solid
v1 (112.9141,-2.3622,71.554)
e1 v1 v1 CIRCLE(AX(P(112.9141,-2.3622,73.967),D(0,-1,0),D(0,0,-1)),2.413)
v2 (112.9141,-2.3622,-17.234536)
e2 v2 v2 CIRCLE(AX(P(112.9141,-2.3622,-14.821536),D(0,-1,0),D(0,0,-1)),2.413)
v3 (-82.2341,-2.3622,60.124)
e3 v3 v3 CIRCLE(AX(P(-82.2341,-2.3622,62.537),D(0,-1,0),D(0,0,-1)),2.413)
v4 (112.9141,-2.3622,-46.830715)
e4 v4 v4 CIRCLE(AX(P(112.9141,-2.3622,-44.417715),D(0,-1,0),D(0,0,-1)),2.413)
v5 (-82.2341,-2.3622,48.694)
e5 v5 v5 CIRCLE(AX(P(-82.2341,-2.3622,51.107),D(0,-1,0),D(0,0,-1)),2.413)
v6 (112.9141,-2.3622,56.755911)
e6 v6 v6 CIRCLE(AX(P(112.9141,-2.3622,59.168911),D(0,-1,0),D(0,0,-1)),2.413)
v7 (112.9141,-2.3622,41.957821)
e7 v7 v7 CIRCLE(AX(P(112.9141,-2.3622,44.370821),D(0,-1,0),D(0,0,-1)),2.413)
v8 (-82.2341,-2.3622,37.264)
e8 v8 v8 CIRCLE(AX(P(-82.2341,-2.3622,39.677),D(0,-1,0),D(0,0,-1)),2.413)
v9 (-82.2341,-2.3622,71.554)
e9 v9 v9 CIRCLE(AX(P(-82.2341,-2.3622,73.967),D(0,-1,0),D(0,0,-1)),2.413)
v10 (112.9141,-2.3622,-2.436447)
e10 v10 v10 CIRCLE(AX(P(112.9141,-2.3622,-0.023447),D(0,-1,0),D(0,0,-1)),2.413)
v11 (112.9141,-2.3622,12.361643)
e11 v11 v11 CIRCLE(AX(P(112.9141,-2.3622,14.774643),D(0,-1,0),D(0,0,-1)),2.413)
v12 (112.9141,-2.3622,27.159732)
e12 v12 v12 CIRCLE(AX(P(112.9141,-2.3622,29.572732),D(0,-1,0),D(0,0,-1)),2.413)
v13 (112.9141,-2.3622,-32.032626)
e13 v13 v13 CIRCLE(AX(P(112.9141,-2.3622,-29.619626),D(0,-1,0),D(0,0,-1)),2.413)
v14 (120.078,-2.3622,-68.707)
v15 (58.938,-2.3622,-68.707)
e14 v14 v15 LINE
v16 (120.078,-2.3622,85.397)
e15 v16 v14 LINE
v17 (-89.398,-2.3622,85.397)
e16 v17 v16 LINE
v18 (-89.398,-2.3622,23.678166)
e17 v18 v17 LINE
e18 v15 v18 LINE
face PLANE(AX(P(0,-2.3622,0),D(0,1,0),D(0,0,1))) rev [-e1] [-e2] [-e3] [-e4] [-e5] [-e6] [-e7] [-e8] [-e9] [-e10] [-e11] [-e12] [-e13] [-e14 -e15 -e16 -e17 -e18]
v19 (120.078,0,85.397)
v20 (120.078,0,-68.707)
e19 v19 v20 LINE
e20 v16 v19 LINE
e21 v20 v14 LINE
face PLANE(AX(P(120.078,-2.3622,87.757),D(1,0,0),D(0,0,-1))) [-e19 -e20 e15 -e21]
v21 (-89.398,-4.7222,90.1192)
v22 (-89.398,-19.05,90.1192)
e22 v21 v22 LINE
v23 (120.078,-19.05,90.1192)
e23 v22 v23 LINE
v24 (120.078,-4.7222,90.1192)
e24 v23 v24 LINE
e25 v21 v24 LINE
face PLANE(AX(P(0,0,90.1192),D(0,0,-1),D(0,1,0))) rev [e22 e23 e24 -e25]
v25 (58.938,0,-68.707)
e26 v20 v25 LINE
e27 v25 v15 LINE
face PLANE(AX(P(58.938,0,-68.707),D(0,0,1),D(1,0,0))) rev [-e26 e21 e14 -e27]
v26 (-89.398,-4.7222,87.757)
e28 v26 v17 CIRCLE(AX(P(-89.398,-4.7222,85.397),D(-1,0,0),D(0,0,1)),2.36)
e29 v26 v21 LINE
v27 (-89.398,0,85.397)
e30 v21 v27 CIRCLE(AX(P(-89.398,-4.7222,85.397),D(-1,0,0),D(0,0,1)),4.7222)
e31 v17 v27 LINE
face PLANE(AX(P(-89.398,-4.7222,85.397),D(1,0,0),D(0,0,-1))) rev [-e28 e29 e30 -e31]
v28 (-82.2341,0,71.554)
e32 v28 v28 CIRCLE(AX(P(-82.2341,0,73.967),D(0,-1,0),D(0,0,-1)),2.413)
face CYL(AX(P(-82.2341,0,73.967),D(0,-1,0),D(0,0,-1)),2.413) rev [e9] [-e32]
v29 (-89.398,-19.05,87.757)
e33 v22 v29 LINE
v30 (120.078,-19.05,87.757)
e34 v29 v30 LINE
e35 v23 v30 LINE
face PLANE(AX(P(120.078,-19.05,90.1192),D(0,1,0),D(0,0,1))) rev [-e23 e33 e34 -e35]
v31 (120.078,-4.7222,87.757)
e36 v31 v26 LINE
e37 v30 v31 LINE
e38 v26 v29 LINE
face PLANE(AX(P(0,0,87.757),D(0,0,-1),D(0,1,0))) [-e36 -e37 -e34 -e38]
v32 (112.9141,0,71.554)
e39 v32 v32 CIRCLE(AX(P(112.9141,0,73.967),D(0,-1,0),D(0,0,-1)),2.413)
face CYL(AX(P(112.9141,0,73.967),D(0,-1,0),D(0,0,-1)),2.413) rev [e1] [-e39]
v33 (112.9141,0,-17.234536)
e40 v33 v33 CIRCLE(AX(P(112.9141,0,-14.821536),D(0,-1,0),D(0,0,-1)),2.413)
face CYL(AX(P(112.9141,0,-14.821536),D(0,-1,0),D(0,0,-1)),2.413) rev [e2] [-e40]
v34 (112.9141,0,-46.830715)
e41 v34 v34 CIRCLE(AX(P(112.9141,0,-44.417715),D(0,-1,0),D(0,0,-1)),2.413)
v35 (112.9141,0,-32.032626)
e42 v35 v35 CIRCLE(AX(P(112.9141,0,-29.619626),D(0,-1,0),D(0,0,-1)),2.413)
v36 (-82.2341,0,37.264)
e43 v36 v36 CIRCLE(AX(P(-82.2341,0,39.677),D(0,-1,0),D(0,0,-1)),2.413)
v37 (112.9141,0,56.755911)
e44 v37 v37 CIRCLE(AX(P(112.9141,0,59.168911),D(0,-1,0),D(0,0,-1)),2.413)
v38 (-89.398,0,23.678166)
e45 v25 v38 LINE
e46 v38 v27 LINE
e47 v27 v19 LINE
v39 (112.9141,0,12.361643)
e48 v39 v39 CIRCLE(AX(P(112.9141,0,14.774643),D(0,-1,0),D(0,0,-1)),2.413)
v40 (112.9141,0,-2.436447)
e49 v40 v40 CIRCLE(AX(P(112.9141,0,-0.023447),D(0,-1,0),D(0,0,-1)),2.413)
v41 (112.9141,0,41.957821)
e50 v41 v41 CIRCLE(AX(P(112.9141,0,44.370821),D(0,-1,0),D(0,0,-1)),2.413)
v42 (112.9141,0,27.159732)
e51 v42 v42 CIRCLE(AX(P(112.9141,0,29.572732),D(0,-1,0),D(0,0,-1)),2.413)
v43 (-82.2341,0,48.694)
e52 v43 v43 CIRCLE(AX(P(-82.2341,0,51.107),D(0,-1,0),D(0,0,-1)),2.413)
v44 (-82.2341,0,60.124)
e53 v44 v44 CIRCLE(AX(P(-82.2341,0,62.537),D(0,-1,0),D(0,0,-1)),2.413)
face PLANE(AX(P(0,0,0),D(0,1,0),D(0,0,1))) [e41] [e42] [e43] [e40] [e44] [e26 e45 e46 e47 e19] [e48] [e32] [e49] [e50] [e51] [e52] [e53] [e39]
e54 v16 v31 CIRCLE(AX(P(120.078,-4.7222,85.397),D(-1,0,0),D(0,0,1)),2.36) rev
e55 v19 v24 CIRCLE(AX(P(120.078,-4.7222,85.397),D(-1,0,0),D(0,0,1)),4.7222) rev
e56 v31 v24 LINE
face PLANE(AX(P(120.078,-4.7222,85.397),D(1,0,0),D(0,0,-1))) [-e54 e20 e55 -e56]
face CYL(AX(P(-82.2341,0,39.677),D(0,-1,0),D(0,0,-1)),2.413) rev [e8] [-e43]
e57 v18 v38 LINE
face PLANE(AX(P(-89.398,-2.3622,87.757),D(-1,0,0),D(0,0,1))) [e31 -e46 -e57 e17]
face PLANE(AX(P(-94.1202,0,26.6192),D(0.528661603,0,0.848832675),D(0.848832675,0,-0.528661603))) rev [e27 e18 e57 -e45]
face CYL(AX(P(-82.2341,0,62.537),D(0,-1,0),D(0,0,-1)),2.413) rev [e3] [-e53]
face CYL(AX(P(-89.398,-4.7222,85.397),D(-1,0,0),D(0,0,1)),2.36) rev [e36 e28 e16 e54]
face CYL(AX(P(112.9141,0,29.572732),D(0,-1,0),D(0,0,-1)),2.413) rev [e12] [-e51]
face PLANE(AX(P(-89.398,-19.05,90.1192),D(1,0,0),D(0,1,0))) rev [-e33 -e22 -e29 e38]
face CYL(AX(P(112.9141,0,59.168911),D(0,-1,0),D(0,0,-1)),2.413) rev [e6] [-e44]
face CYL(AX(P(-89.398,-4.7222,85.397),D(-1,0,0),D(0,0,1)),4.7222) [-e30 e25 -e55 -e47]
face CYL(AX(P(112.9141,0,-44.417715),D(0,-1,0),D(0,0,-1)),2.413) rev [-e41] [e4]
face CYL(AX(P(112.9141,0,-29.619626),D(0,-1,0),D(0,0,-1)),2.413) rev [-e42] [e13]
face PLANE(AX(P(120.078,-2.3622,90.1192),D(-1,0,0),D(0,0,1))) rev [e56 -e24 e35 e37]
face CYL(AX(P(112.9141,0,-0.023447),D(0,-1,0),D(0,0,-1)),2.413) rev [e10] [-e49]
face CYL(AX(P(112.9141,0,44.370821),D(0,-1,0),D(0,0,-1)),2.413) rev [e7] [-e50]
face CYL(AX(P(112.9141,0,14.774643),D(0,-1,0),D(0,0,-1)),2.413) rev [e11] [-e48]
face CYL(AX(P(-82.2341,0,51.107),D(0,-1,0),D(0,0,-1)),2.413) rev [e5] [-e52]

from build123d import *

# Parameters (mm, degrees)
SKETCH1_W                    = 209.476
SKETCH1_H                    = 175.514
BASE_FLANGE1_DEPTH           = 2.3622
EDGE_FLANGE4_STRIP_W         = 14.1688
EDGE_FLANGE4_STRIP_H         = 2.3622
EDGE_FLANGE4_STRIP_CUT_DEPTH = 209.476
EDGE_FLANGE4_DEPTH           = 209.476
CUT_EXTRUDE1_DEPTH           = 152.058528265
SKETCH38_R                   = 2.413
CUT_EXTRUDE2_DEPTH           = 152.058528265
SKETCH39_R                   = 2.413
CUT_EXTRUDE3_DEPTH           = 152.058528265


# Sheet-metal steps are written as plain solids
with BuildPart() as part:
    # Sketch1 → Base-Flange1 (new body)
    with BuildSketch(Plane(origin=(0, 0, 0), x_dir=(1, 0, 0), z_dir=(0, 1, 0))):
        with Locations((15.34, 0)):
            Rectangle(SKETCH1_W, SKETCH1_H)
    extrude(amount=-BASE_FLANGE1_DEPTH)

    # Edge-Flange4 strip (across the edge) → Edge-Flange4 strip cut (cut)
    with BuildSketch(Plane(origin=(120.078, -2.3622, 87.757), x_dir=(0, 0, -1), z_dir=(-1, 0, 0))):
        with Locations((-4.7244, -1.1811)):
            Rectangle(EDGE_FLANGE4_STRIP_W, EDGE_FLANGE4_STRIP_H)
    extrude(amount=EDGE_FLANGE4_STRIP_CUT_DEPTH, mode=Mode.SUBTRACT)

    # Edge-Flange4 section (across the edge) → Edge-Flange4 (add)
    with BuildSketch(Plane(origin=(120.078, -2.3622, 87.757), x_dir=(0, 0, -1), z_dir=(-1, 0, 0))):
        with BuildLine():
            Line((-2.3622, 2.36), (-2.3622, 16.6878))
            Line((-2.3622, 16.6878), (0, 16.6878))
            Line((0, 16.6878), (0, 2.36))
            ThreePointArc((0, 2.36), (0.691227996, 0.691227996), (2.36, 0))
            Line((2.36, 0), (2.36, -2.3622))
            ThreePointArc((2.36, -2.3622), (-0.979099642, -0.979099642), (-2.3622, 2.36))
        make_face()
    extrude(amount=EDGE_FLANGE4_DEPTH)

    # Sketch36 → Cut-Extrude1 (cut, through all)
    with BuildSketch(Plane.XZ.offset(2.3622)):
        Polygon((-94.1202, 26.6192), (58.938, -68.707), (140.022587244, -68.707), (140.022587244, -102.574234495), (-121.93122604, -102.574234495), (-121.93122604, 26.6192), align=None)
    extrude(amount=-CUT_EXTRUDE1_DEPTH, mode=Mode.SUBTRACT)

    # Sketch38 → Cut-Extrude2 (cut, through all)
    with BuildSketch(Plane.XZ.offset(2.3622)):
        with Locations(Location((-82.2341, 73.967, 0), (0, 0, 270))):
            Circle(SKETCH38_R)
        with Locations(Location((-82.2341, 62.537, 0), (0, 0, 270))):
            Circle(SKETCH38_R)
        with Locations(Location((-82.2341, 51.107, 0), (0, 0, 270))):
            Circle(SKETCH38_R)
        with Locations(Location((-82.2341, 39.677, 0), (0, 0, 270))):
            Circle(SKETCH38_R)
    extrude(amount=-CUT_EXTRUDE2_DEPTH, mode=Mode.SUBTRACT)

    # Sketch39 → Cut-Extrude3 (cut, through all)
    with BuildSketch(Plane.XZ.offset(2.3622)):
        with Locations(Location((112.9141, 73.967, 0), (0, 0, 270))):
            Circle(SKETCH39_R)
        with Locations(Location((112.9141, 59.168910638, 0), (0, 0, 270))):
            Circle(SKETCH39_R)
        with Locations(Location((112.9141, 44.370821275, 0), (0, 0, 270))):
            Circle(SKETCH39_R)
        with Locations(Location((112.9141, 29.572731913, 0), (0, 0, 270))):
            Circle(SKETCH39_R)
        with Locations(Location((112.9141, 14.774642551, 0), (0, 0, 270))):
            Circle(SKETCH39_R)
        with Locations(Location((112.9141, -0.023446812, 0), (0, 0, 270))):
            Circle(SKETCH39_R)
        with Locations(Location((112.9141, -14.821536174, 0), (0, 0, 270))):
            Circle(SKETCH39_R)
        with Locations(Location((112.9141, -29.619625536, 0), (0, 0, 270))):
            Circle(SKETCH39_R)
        with Locations(Location((112.9141, -44.417714899, 0), (0, 0, 270))):
            Circle(SKETCH39_R)
    extrude(amount=-CUT_EXTRUDE3_DEPTH, mode=Mode.SUBTRACT)


solid = part.part
